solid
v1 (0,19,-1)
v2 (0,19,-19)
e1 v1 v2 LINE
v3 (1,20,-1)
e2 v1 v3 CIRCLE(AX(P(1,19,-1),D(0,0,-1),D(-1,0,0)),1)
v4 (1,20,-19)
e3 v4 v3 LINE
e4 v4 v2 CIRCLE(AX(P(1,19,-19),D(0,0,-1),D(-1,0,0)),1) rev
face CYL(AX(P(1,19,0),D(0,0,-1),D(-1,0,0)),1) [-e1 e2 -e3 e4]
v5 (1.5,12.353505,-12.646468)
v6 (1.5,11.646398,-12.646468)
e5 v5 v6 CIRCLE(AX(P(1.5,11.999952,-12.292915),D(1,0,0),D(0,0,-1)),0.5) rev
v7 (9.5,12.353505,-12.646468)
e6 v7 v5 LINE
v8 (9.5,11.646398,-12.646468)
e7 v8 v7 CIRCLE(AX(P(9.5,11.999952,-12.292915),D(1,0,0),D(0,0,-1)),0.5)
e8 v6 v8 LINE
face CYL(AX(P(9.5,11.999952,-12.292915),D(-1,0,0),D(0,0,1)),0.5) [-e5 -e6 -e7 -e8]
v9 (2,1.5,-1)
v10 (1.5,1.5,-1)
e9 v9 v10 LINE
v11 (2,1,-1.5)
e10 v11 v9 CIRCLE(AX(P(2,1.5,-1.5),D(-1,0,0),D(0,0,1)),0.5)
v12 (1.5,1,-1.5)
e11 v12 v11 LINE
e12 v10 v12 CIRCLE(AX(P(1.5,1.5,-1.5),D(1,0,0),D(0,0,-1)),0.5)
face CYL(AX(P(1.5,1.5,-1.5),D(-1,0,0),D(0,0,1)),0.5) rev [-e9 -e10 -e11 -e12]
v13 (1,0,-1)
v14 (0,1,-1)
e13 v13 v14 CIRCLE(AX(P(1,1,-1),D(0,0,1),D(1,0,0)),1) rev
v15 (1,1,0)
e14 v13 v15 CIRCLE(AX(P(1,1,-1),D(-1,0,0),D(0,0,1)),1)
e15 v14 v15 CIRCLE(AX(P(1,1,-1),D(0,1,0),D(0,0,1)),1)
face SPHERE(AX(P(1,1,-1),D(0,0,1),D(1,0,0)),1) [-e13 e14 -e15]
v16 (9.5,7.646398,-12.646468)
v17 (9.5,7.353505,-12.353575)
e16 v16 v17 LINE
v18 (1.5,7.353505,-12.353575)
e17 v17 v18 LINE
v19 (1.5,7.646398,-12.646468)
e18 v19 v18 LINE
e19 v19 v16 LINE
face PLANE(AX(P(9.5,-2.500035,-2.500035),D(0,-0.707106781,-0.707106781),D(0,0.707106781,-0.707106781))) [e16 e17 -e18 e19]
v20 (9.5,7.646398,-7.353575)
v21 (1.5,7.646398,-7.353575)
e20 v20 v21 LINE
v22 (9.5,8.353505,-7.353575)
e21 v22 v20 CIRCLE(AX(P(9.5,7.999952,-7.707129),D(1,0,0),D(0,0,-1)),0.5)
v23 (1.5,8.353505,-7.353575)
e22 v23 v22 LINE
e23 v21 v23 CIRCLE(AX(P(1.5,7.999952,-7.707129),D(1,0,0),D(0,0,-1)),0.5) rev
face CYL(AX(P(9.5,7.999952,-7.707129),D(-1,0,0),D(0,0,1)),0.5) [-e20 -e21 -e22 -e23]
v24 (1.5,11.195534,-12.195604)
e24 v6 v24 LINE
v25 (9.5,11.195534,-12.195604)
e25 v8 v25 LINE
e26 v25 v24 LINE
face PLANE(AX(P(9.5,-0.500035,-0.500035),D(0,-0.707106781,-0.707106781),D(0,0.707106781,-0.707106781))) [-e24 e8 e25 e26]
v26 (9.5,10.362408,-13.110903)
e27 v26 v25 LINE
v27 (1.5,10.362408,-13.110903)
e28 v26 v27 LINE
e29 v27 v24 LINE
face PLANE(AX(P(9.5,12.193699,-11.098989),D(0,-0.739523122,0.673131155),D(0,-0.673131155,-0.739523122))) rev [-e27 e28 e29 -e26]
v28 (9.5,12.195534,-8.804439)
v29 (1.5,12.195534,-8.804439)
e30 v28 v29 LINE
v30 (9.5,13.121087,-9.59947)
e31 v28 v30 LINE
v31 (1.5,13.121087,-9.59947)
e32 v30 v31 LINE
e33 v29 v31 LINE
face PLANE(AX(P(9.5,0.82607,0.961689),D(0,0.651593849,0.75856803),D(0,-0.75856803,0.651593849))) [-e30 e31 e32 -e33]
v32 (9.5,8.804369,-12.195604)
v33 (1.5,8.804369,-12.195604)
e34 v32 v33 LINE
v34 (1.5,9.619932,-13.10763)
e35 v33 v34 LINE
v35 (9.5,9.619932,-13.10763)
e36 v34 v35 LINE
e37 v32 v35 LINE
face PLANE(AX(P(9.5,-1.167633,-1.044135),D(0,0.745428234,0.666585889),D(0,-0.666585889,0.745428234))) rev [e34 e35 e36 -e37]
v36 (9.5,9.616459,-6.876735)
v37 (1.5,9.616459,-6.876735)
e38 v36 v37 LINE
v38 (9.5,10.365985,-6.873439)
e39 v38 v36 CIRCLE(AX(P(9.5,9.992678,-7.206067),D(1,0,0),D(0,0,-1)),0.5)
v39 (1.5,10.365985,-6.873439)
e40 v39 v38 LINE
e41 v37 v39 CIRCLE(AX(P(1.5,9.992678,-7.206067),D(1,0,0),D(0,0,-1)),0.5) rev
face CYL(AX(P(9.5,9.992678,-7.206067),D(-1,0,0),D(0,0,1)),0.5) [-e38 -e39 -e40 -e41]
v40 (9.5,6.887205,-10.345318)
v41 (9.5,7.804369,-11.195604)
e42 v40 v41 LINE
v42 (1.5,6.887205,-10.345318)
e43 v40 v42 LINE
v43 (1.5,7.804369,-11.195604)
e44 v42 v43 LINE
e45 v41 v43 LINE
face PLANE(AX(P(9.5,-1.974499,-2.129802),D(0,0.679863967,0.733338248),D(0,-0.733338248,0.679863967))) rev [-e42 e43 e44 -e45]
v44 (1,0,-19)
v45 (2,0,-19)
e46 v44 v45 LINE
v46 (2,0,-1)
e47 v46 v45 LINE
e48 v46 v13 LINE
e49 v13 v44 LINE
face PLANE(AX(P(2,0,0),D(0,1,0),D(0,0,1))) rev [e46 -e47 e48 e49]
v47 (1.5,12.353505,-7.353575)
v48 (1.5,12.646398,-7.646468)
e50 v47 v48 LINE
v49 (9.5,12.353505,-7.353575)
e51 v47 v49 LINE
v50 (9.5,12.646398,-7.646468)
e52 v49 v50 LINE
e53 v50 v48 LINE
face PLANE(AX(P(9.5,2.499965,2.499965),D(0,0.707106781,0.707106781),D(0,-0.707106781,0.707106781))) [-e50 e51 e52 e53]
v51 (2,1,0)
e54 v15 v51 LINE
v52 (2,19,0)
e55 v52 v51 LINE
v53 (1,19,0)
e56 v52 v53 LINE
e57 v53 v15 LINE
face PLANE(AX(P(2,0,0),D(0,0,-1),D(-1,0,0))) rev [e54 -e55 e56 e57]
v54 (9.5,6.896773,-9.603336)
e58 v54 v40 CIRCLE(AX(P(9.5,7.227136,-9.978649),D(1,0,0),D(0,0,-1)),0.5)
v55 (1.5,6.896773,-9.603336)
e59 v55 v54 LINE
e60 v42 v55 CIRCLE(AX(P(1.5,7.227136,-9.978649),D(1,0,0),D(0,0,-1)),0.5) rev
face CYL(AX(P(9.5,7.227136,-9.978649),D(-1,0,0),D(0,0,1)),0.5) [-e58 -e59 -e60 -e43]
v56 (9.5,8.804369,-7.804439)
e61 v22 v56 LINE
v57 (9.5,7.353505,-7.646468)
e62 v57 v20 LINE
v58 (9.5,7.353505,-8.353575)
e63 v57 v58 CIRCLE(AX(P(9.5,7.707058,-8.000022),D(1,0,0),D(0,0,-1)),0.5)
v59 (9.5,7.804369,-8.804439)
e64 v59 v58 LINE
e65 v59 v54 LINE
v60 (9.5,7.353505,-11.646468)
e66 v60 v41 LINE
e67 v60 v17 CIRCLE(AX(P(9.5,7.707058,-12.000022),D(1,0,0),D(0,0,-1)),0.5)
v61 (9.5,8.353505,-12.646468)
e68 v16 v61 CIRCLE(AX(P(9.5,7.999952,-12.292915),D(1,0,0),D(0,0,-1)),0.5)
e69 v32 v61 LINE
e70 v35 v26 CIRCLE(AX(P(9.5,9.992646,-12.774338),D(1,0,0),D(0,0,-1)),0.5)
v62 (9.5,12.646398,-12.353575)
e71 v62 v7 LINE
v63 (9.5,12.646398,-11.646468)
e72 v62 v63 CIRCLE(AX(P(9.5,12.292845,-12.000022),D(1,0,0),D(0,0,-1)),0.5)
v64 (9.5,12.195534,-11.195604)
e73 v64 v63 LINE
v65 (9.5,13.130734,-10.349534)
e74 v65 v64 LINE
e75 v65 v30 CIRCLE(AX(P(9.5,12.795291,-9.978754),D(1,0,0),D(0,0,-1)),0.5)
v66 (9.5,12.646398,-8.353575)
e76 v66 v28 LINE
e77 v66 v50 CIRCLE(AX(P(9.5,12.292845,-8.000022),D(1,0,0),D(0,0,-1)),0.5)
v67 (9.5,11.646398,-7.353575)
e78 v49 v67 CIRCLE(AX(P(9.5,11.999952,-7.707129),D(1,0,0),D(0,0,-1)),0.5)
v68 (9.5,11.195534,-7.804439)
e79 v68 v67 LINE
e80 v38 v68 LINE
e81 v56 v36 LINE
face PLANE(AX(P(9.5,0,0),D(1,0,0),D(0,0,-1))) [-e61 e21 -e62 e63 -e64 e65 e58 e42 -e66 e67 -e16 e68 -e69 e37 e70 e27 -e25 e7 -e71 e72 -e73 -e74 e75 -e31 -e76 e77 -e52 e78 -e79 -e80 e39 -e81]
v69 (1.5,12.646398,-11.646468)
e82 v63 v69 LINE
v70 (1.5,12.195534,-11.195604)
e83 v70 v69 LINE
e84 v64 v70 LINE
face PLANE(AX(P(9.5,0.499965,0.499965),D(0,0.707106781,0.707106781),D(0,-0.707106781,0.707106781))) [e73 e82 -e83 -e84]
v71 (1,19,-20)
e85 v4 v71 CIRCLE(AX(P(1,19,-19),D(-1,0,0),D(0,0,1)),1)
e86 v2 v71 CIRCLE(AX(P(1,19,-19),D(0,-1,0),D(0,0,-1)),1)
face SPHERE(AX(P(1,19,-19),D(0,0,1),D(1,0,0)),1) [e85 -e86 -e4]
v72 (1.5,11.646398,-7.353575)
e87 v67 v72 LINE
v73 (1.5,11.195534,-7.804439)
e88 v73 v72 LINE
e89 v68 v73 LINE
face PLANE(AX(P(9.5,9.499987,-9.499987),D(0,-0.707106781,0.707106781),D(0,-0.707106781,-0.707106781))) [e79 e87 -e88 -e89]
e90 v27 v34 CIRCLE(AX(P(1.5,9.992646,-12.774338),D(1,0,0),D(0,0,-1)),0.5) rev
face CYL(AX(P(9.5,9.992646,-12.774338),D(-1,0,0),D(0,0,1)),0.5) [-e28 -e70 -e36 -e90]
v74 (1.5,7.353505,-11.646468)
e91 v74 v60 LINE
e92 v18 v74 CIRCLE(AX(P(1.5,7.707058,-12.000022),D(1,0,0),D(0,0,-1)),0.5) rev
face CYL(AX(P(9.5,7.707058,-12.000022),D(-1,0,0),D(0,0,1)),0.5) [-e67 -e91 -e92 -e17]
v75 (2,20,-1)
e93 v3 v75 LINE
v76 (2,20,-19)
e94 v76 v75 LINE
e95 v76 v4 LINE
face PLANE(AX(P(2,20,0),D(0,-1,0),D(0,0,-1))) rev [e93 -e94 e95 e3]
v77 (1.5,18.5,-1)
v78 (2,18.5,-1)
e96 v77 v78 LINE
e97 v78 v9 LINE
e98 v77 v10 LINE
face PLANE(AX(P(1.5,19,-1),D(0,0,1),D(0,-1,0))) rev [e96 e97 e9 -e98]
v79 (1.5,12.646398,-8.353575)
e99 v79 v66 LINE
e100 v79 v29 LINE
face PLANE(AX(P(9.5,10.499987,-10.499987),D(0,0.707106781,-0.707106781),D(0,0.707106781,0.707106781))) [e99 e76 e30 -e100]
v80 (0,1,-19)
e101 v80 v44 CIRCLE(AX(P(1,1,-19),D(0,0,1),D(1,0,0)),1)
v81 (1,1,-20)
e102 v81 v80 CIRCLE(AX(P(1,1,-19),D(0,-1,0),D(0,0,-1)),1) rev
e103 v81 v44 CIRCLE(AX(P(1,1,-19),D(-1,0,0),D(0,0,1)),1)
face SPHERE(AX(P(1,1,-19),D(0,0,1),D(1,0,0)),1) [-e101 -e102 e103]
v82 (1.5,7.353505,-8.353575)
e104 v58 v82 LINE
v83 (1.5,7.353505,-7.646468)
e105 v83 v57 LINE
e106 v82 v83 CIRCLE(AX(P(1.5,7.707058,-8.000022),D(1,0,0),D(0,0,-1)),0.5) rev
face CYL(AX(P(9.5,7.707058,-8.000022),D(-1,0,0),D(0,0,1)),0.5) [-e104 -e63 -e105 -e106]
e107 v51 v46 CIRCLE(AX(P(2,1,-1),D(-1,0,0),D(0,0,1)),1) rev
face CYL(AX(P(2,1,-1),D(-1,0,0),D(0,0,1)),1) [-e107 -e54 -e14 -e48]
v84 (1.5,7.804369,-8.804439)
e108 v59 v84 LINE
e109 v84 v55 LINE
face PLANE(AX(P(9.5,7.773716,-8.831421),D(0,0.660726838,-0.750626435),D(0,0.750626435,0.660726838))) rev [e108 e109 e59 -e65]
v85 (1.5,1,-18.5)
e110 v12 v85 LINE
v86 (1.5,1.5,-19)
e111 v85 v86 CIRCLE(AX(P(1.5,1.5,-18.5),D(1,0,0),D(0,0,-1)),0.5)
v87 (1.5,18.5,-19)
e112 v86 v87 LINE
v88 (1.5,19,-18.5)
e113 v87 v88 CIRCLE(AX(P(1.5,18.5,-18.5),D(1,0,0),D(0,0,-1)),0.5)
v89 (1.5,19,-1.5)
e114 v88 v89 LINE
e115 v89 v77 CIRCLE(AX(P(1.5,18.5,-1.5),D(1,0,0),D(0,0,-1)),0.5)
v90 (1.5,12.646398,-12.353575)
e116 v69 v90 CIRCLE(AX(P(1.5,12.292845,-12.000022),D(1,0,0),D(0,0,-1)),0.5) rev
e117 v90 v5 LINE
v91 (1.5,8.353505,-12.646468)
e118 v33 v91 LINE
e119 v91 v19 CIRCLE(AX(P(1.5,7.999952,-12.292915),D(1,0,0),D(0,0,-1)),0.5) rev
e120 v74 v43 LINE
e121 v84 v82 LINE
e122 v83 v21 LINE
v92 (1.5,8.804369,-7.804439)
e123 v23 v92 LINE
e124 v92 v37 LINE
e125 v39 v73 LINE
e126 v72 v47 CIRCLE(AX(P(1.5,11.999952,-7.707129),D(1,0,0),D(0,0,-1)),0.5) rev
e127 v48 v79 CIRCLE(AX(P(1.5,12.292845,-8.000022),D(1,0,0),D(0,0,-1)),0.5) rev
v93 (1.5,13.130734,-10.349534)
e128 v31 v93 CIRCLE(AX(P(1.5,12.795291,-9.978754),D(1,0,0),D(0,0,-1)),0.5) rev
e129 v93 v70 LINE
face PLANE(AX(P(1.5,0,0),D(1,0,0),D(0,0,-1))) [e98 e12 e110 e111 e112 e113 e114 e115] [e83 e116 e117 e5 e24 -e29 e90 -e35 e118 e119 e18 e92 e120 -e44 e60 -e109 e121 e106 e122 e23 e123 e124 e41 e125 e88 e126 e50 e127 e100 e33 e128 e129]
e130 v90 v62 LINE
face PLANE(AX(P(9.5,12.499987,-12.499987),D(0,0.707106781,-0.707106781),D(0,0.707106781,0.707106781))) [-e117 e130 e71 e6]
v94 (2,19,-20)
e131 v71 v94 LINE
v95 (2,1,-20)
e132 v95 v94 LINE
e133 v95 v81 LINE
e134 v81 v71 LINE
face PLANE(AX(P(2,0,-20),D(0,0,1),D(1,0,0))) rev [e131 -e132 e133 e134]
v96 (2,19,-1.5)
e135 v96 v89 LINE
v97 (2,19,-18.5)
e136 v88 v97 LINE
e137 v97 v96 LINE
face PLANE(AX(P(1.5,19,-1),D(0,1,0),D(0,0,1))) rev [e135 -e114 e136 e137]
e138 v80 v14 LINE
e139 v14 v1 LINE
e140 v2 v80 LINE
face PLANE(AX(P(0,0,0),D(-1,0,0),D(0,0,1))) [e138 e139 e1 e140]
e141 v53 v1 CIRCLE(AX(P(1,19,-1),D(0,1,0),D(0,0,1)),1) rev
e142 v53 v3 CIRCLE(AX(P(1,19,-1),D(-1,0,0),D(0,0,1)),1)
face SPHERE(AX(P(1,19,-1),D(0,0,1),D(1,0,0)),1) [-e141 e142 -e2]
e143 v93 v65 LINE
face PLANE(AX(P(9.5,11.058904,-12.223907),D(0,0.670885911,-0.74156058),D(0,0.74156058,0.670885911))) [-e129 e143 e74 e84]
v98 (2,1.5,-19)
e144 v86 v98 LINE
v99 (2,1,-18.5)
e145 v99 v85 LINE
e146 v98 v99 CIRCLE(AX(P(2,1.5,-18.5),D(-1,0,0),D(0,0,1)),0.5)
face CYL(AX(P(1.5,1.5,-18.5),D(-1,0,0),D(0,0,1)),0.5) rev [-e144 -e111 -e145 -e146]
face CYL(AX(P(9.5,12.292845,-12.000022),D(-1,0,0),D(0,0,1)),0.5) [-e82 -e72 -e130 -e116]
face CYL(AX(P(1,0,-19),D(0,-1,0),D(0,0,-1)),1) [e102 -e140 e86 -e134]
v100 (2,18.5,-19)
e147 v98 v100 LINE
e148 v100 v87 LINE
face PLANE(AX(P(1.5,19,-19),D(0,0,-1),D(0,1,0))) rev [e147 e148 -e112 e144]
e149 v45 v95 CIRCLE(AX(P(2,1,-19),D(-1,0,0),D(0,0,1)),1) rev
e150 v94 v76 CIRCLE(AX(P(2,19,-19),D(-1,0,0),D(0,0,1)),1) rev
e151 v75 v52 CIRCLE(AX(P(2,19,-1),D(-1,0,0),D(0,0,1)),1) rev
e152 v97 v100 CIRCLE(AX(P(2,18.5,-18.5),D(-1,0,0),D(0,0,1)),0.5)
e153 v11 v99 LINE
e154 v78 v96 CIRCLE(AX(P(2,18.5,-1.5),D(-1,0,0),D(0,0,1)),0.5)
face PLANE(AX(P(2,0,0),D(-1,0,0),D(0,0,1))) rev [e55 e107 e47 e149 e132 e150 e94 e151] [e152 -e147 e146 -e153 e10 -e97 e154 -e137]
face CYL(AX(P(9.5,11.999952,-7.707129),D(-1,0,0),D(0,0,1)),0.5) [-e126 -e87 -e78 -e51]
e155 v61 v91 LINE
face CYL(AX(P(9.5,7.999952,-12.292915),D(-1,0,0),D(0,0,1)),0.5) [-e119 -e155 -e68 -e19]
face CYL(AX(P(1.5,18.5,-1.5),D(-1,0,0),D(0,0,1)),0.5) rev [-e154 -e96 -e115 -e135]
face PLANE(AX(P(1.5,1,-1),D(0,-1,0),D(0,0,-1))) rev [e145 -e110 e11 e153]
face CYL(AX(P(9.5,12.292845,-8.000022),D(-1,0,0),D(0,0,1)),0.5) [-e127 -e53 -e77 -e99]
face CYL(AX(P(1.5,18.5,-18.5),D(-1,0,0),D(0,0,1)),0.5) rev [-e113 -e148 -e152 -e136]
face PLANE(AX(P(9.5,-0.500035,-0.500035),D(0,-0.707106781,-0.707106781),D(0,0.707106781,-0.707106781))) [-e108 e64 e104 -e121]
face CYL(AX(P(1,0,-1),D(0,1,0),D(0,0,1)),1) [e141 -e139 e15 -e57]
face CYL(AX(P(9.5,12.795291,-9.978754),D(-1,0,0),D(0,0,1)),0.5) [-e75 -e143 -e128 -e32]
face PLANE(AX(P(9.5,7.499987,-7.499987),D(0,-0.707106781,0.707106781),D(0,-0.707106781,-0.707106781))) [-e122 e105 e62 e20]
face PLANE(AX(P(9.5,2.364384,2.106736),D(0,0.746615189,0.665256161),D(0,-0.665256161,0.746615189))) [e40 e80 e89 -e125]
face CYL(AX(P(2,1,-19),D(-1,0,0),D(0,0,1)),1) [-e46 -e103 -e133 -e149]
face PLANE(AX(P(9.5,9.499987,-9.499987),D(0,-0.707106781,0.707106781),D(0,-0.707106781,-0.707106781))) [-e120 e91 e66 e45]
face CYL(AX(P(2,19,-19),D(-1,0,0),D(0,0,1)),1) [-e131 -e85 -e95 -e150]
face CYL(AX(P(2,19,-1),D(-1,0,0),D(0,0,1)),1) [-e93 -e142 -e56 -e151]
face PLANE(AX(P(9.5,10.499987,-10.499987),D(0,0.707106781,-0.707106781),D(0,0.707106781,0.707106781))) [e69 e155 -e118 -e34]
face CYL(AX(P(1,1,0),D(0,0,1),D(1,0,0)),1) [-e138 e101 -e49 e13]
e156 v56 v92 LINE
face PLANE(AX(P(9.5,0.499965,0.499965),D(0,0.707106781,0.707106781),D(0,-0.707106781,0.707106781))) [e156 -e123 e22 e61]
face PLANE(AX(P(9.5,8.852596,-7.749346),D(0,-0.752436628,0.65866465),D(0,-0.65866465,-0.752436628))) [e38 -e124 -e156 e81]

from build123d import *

# Parameters (mm, degrees)
SKETCH2_W           = 20
SKETCH2_H           = 20
BOSS_EXTRUDE1_DEPTH = 2
SKETCH3_W           = 18
SKETCH3_H           = 18
CUT_EXTRUDE1_DEPTH  = 0.5
FILLET1_R           = 1
FILLET2_R           = 1
FILLET3_R           = 0.5
BOSS_EXTRUDE3_DEPTH = 8
FILLET4_R           = 0.5


with BuildPart() as part:
    # Sketch2 → Boss-Extrude1 (new body)
    with BuildSketch(Plane(origin=(0, 0, 0), x_dir=(0, 0, -1), z_dir=(1, 0, 0))):
        with Locations((10, 10)):
            Rectangle(SKETCH2_W, SKETCH2_H)
    extrude(amount=BOSS_EXTRUDE1_DEPTH)

    # Sketch3 → Cut-Extrude1 (cut)
    with BuildSketch(Plane(origin=(2, 0, 0), x_dir=(0, 0, -1), z_dir=(1, 0, 0))):
        with Locations((10, 10)):
            Rectangle(SKETCH3_W, SKETCH3_H)
    extrude(amount=-CUT_EXTRUDE1_DEPTH, mode=Mode.SUBTRACT)

    # Fillet1
    fillet1_edges = [part.edges().sort_by_distance(p)[0] for p in [
        (0, 20, -10),
        (0, 10, -20),
        (0, 0, -10),
        (0, 10, 0),
    ]]
    fillet(fillet1_edges, radius=FILLET1_R)

    # Fillet2
    # the kernel refuses this fillet: 1 mm, written as the material it takes off along each edge
    with BuildSketch(Plane(origin=(1, 19, -1), x_dir=(0, 1, 0), z_dir=(0, 0, 1))) as fillet2_piece_1_section:
        Polygon((0, 0), (FILLET2_R, 0), (FILLET2_R, FILLET2_R), (0, FILLET2_R), align=None)
    fillet2_piece_1 = extrude(amount=FILLET2_R, mode=Mode.PRIVATE)
    fillet2_piece_1 = fillet2_piece_1 - Plane(origin=(1, 19, -1), x_dir=(0.7071067811865475, -0.7071067811865475, 0), z_dir=(0, 0, 1)) * Sphere(FILLET2_R, mode=Mode.PRIVATE)
    add(fillet2_piece_1, mode=Mode.SUBTRACT)
    with BuildSketch(Plane(origin=(1, 19, -19), x_dir=(0, 1, 0), z_dir=(0, 0, -1))) as fillet2_piece_2_section:
        Polygon((0, 0), (FILLET2_R, 0), (FILLET2_R, -FILLET2_R), (0, -FILLET2_R), align=None)
    fillet2_piece_2 = extrude(amount=FILLET2_R, mode=Mode.PRIVATE)
    fillet2_piece_2 = fillet2_piece_2 - Plane(origin=(1, 19, -19), x_dir=(0.7071067811865475, -0.7071067811865475, 0), z_dir=(0, 0, -1)) * Sphere(FILLET2_R, mode=Mode.PRIVATE)
    add(fillet2_piece_2, mode=Mode.SUBTRACT)
    with BuildSketch(Plane(origin=(1, 1, -1), x_dir=(0, 0, 1), z_dir=(0, -1, 0))) as fillet2_piece_3_section:
        Polygon((0, 0), (FILLET2_R, 0), (FILLET2_R, FILLET2_R), (0, FILLET2_R), align=None)
    fillet2_piece_3 = extrude(amount=FILLET2_R, mode=Mode.PRIVATE)
    fillet2_piece_3 = fillet2_piece_3 - Plane(origin=(1, 1, -1), x_dir=(0.7071067811865475, 0, -0.7071067811865475), z_dir=(0, -1, 0)) * Sphere(FILLET2_R, mode=Mode.PRIVATE)
    add(fillet2_piece_3, mode=Mode.SUBTRACT)
    with BuildSketch(Plane(origin=(1, 1, -19), x_dir=(0, 0, -1), z_dir=(0, -1, 0))) as fillet2_piece_4_section:
        Polygon((0, 0), (FILLET2_R, 0), (FILLET2_R, -FILLET2_R), (0, -FILLET2_R), align=None)
    fillet2_piece_4 = extrude(amount=FILLET2_R, mode=Mode.PRIVATE)
    fillet2_piece_4 = fillet2_piece_4 - Plane(origin=(1, 1, -19), x_dir=(0.7071067811865475, 0, 0.7071067811865475), z_dir=(0, -1, 0)) * Sphere(FILLET2_R, mode=Mode.PRIVATE)
    add(fillet2_piece_4, mode=Mode.SUBTRACT)
    with BuildSketch(Plane(origin=(1, 20, 0), x_dir=(0, -1, 0), z_dir=(1, 0, 0)), Plane(origin=(1, 0, 0), x_dir=(0, 0, -1), z_dir=(1, 0, 0))) as fillet2_piece_5:
        with BuildLine():
            CenterArc((FILLET2_R, FILLET2_R), FILLET2_R, 180, 90)
            Line((0, FILLET2_R), (0, 0))
            Line((0, 0), (FILLET2_R, 0))
        make_face()
    extrude(amount=3.5, mode=Mode.SUBTRACT)
    with BuildSketch(Plane(origin=(1, 20, -20), x_dir=(0, -1, 0), z_dir=(1, 0, 0)), Plane(origin=(1, 0, -20), x_dir=(0, 0, 1), z_dir=(1, 0, 0))) as fillet2_piece_6:
        with BuildLine():
            CenterArc((FILLET2_R, -FILLET2_R), FILLET2_R, 90, 90)
            Line((0, -FILLET2_R), (0, 0))
            Line((0, 0), (FILLET2_R, 0))
        make_face()
    extrude(amount=3.5, mode=Mode.SUBTRACT)

    # Fillet3
    fillet3_edges = [part.edges().sort_by_distance(p)[0] for p in [
        (1.75, 1, -1),
        (1.75, 19, -1),
        (1.75, 19, -19),
        (1.75, 1, -19),
    ]]
    fillet(fillet3_edges, radius=FILLET3_R)

    # Sketch5 → Boss-Extrude3 (add)
    with BuildSketch(Plane(origin=(1.5, 0, 0), x_dir=(0, 0, -1), z_dir=(1, 0, 0))):
        with BuildLine():
            Line((10.674031368, 12.407379911), (10.674031368, 12.772052319))
            Line((10.674031368, 12.772052319), (9.969031368, 13.551320747))
            Line((9.969031368, 13.551320747), (9.264031368, 12.730578714))
            Line((9.264031368, 12.730578714), (9.264031368, 12.389160229))
            ThreePointArc((9.264031368, 12.389160229), (9.967720161, 12.499742887), (10.674031368, 12.407379911))
        make_face()
        with BuildLine():
            ThreePointArc((8.804439368, 12.195534071), (9.029395093, 12.30383605), (9.264031368, 12.389160229))
            Line((9.264031368, 12.389160229), (9.264031368, 12.730578714))
            Line((9.264031368, 12.730578714), (8.804439368, 12.195534071))
        make_face()
        with BuildLine():
            ThreePointArc((10.674031368, 12.407379911), (10.940799854, 12.316184891), (11.19560436, 12.195534071))
            Line((11.19560436, 12.195534071), (10.674031368, 12.772052319))
            Line((10.674031368, 12.772052319), (10.674031368, 12.407379911))
        make_face()
        with BuildLine():
            Line((9.264031368, 12.195534071), (10.674031368, 12.195534071))
            Line((10.674031368, 12.195534071), (10.674031368, 12.407379911))
            ThreePointArc((10.674031368, 12.407379911), (9.967720161, 12.499742887), (9.264031368, 12.389160229))
            Line((9.264031368, 12.389160229), (9.264031368, 12.195534071))
        make_face()
        with BuildLine():
            Line((8.804439368, 12.195534071), (9.264031368, 12.195534071))
            Line((9.264031368, 12.195534071), (9.264031368, 12.389160229))
            ThreePointArc((9.264031368, 12.389160229), (9.029395093, 12.30383605), (8.804439368, 12.195534071))
        make_face()
        with BuildLine():
            Line((10.674031368, 12.195534071), (11.19560436, 12.195534071))
            ThreePointArc((11.19560436, 12.195534071), (10.940799854, 12.316184891), (10.674031368, 12.407379911))
            Line((10.674031368, 12.407379911), (10.674031368, 12.195534071))
        make_face()
        Polygon((10.000021864, 10.999951576), (10.674031368, 11.67396108), (10.674031368, 12.195534071), (9.264031368, 12.195534071), (9.264031368, 11.735942071), align=None)
        Polygon((9.264031368, 11.735942071), (9.264031368, 12.195534071), (8.804439368, 12.195534071), align=None)
        Polygon((10.674031368, 11.67396108), (11.19560436, 12.195534071), (10.674031368, 12.195534071), align=None)
        with BuildLine():
            ThreePointArc((12.19560436, 11.195534071), (11.767788817, 11.767718529), (11.19560436, 12.195534071))
            Line((11.19560436, 12.195534071), (10.674031368, 11.67396108))
            Line((10.674031368, 11.67396108), (10.674031368, 10.694356296))
            Line((10.674031368, 10.694356296), (11.694426585, 10.694356296))
            Line((11.694426585, 10.694356296), (12.19560436, 11.195534071))
        make_face()
        with BuildLine():
            Line((13.000021864, 11.999951576), (12.000021864, 12.999951576))
            Line((12.000021864, 12.999951576), (11.19560436, 12.195534071))
            ThreePointArc((11.19560436, 12.195534071), (11.767788817, 11.767718529), (12.19560436, 11.195534071))
            Line((12.19560436, 11.195534071), (13.000021864, 11.999951576))
        make_face()
        with BuildLine():
            Line((9.264031368, 10.694356296), (9.264031368, 11.735942071))
            Line((9.264031368, 11.735942071), (8.804439368, 12.195534071))
            ThreePointArc((8.804439368, 12.195534071), (8.232254911, 11.767718529), (7.804439368, 11.195534071))
            Line((7.804439368, 11.195534071), (8.305617143, 10.694356296))
            Line((8.305617143, 10.694356296), (9.264031368, 10.694356296))
        make_face()
        with BuildLine():
            ThreePointArc((7.804439368, 11.195534071), (8.232254911, 11.767718529), (8.804439368, 12.195534071))
            Line((8.804439368, 12.195534071), (8.000021864, 12.999951576))
            Line((8.000021864, 12.999951576), (7.000021864, 11.999951576))
            Line((7.000021864, 11.999951576), (7.804439368, 11.195534071))
        make_face()
        Polygon((9.694426585, 10.694356296), (10.000021864, 10.999951576), (9.264031368, 11.735942071), (9.264031368, 10.694356296), align=None)
        Polygon((10.674031368, 10.694356296), (10.674031368, 11.67396108), (10.000021864, 10.999951576), (10.305617143, 10.694356296), align=None)
        Polygon((10.305617143, 10.694356296), (10.000021864, 10.999951576), (9.694426585, 10.694356296), align=None)
        Polygon((9.264031368, 10.26396108), (9.694426585, 10.694356296), (9.264031368, 10.694356296), align=None)
        Polygon((9.000021864, 9.999951576), (9.264031368, 10.26396108), (9.264031368, 10.694356296), (8.305617143, 10.694356296), align=None)
        Polygon((10.305617143, 10.694356296), (9.694426585, 10.694356296), (9.264031368, 10.26396108), (9.264031368, 9.735942071), (9.715617143, 9.284356296), (10.284426585, 9.284356296), (10.674031368, 9.67396108), (10.674031368, 10.325942071), align=None)
        Polygon((11.000021864, 9.999951576), (11.694426585, 10.694356296), (10.674031368, 10.694356296), (10.674031368, 10.325942071), align=None)
        Polygon((9.264031368, 9.735942071), (9.264031368, 10.26396108), (9.000021864, 9.999951576), align=None)
        Polygon((10.674031368, 9.67396108), (11.000021864, 9.999951576), (10.674031368, 10.325942071), align=None)
        Polygon((10.674031368, 10.325942071), (10.674031368, 10.694356296), (10.305617143, 10.694356296), align=None)
        with BuildLine():
            Line((7.804439368, 10.694356296), (7.804439368, 11.195534071))
            ThreePointArc((7.804439368, 11.195534071), (7.687799186, 10.950544173), (7.59839698, 10.694356296))
            Line((7.59839698, 10.694356296), (7.804439368, 10.694356296))
        make_face()
        with BuildLine():
            Line((7.804439368, 9.284356296), (7.804439368, 10.694356296))
            Line((7.804439368, 10.694356296), (7.59839698, 10.694356296))
            ThreePointArc((7.59839698, 10.694356296), (7.500046256, 9.988908081), (7.604625572, 9.284356296))
            Line((7.604625572, 9.284356296), (7.804439368, 9.284356296))
        make_face()
        with BuildLine():
            ThreePointArc((7.59839698, 10.694356296), (7.687799186, 10.950544173), (7.804439368, 11.195534071))
            Line((7.804439368, 11.195534071), (7.241968907, 10.694356296))
            Line((7.241968907, 10.694356296), (7.59839698, 10.694356296))
        make_face()
        with BuildLine():
            Line((7.59839698, 10.694356296), (7.241968907, 10.694356296))
            Line((7.241968907, 10.694356296), (6.450749314, 9.989356296))
            Line((6.450749314, 9.989356296), (7.256117908, 9.284356296))
            Line((7.256117908, 9.284356296), (7.604625572, 9.284356296))
            ThreePointArc((7.604625572, 9.284356296), (7.500046256, 9.988908081), (7.59839698, 10.694356296))
        make_face()
        Polygon((8.284426585, 9.284356296), (9.000021864, 9.999951576), (8.305617143, 10.694356296), (7.804439368, 10.694356296), (7.804439368, 9.284356296), align=None)
        Polygon((8.305617143, 10.694356296), (7.804439368, 11.195534071), (7.804439368, 10.694356296), align=None)
        with BuildLine():
            Line((7.804439368, 8.80436908), (7.804439368, 9.284356296))
            Line((7.804439368, 9.284356296), (7.604625572, 9.284356296))
            ThreePointArc((7.604625572, 9.284356296), (7.692020891, 9.039154245), (7.804439368, 8.80436908))
        make_face()
        Polygon((7.804439368, 8.80436908), (8.284426585, 9.284356296), (7.804439368, 9.284356296), align=None)
        with BuildLine():
            Line((9.264031368, 9.284356296), (8.284426585, 9.284356296))
            Line((8.284426585, 9.284356296), (7.804439368, 8.80436908))
            ThreePointArc((7.804439368, 8.80436908), (8.232254911, 8.232184623), (8.804439368, 7.80436908))
            Line((8.804439368, 7.80436908), (9.264031368, 8.26396108))
            Line((9.264031368, 8.26396108), (9.264031368, 9.284356296))
        make_face()
        Polygon((9.264031368, 9.735942071), (9.000021864, 9.999951576), (8.284426585, 9.284356296), (9.264031368, 9.284356296), align=None)
        Polygon((9.715617143, 9.284356296), (9.264031368, 9.735942071), (9.264031368, 9.284356296), align=None)
        Polygon((9.264031368, 8.26396108), (10.000021864, 8.999951576), (9.715617143, 9.284356296), (9.264031368, 9.284356296), align=None)
        Polygon((9.264031368, 7.80436908), (9.264031368, 8.26396108), (8.804439368, 7.80436908), align=None)
        Polygon((10.674031368, 8.325942071), (10.000021864, 8.999951576), (9.264031368, 8.26396108), (9.264031368, 7.80436908), (10.674031368, 7.80436908), align=None)
        with BuildLine():
            Line((10.674031368, 7.592523241), (10.674031368, 7.80436908))
            Line((10.674031368, 7.80436908), (9.264031368, 7.80436908))
            Line((9.264031368, 7.80436908), (9.264031368, 7.610742922))
            ThreePointArc((9.264031368, 7.610742922), (9.967720161, 7.500160264), (10.674031368, 7.592523241))
        make_face()
        with BuildLine():
            Line((12.19560436, 8.80436908), (11.715617143, 9.284356296))
            Line((11.715617143, 9.284356296), (10.674031368, 9.284356296))
            Line((10.674031368, 9.284356296), (10.674031368, 8.325942071))
            Line((10.674031368, 8.325942071), (11.19560436, 7.80436908))
            ThreePointArc((11.19560436, 7.80436908), (11.767788817, 8.232184623), (12.19560436, 8.80436908))
        make_face()
        Polygon((10.674031368, 9.284356296), (10.284426585, 9.284356296), (10.000021864, 8.999951576), (10.674031368, 8.325942071), align=None)
        Polygon((10.000021864, 8.999951576), (10.284426585, 9.284356296), (9.715617143, 9.284356296), align=None)
        Polygon((10.674031368, 9.284356296), (10.674031368, 9.67396108), (10.284426585, 9.284356296), align=None)
        Polygon((11.715617143, 9.284356296), (11.000021864, 9.999951576), (10.674031368, 9.67396108), (10.674031368, 9.284356296), align=None)
        Polygon((12.19560436, 10.694356296), (11.694426585, 10.694356296), (11.000021864, 9.999951576), (11.715617143, 9.284356296), (12.19560436, 9.284356296), align=None)
        Polygon((12.19560436, 10.694356296), (12.19560436, 11.195534071), (11.694426585, 10.694356296), align=None)
        with BuildLine():
            ThreePointArc((12.401646748, 10.694356296), (12.312244542, 10.950544173), (12.19560436, 11.195534071))
            Line((12.19560436, 11.195534071), (12.19560436, 10.694356296))
            Line((12.19560436, 10.694356296), (12.401646748, 10.694356296))
        make_face()
        with BuildLine():
            Line((12.401646748, 10.694356296), (12.19560436, 10.694356296))
            Line((12.19560436, 10.694356296), (12.19560436, 9.284356296))
            Line((12.19560436, 9.284356296), (12.395418156, 9.284356296))
            ThreePointArc((12.395418156, 9.284356296), (12.473732713, 9.638351472), (12.500021864, 9.999951576))
            ThreePointArc((12.500021864, 9.999951576), (12.475305909, 10.350620786), (12.401646748, 10.694356296))
        make_face()
        Polygon((12.19560436, 8.80436908), (12.19560436, 9.284356296), (11.715617143, 9.284356296), align=None)
        with BuildLine():
            Line((12.395418156, 9.284356296), (12.19560436, 9.284356296))
            Line((12.19560436, 9.284356296), (12.19560436, 8.80436908))
            ThreePointArc((12.19560436, 8.80436908), (12.308022836, 9.039154245), (12.395418156, 9.284356296))
        make_face()
        with BuildLine():
            Line((13.520749314, 9.989356296), (12.746214074, 10.694356296))
            Line((12.746214074, 10.694356296), (12.401646748, 10.694356296))
            ThreePointArc((12.401646748, 10.694356296), (12.475305909, 10.350620786), (12.500021864, 9.999951576))
            ThreePointArc((12.500021864, 9.999951576), (12.473732713, 9.638351472), (12.395418156, 9.284356296))
            Line((12.395418156, 9.284356296), (12.732363431, 9.284356296))
            Line((12.732363431, 9.284356296), (13.520749314, 9.989356296))
        make_face()
        with BuildLine():
            Line((12.19560436, 8.80436908), (12.732363431, 9.284356296))
            Line((12.732363431, 9.284356296), (12.395418156, 9.284356296))
            ThreePointArc((12.395418156, 9.284356296), (12.308022836, 9.039154245), (12.19560436, 8.80436908))
        make_face()
        with BuildLine():
            Line((12.746214074, 10.694356296), (12.19560436, 11.195534071))
            ThreePointArc((12.19560436, 11.195534071), (12.312244542, 10.950544173), (12.401646748, 10.694356296))
            Line((12.401646748, 10.694356296), (12.746214074, 10.694356296))
        make_face()
        Polygon((10.674031368, 7.80436908), (11.19560436, 7.80436908), (10.674031368, 8.325942071), align=None)
        with BuildLine():
            ThreePointArc((10.674031368, 7.592523241), (10.940799854, 7.68371826), (11.19560436, 7.80436908))
            Line((11.19560436, 7.80436908), (10.674031368, 7.80436908))
            Line((10.674031368, 7.80436908), (10.674031368, 7.592523241))
        make_face()
        with BuildLine():
            Line((9.264031368, 7.610742922), (9.264031368, 7.80436908))
            Line((9.264031368, 7.80436908), (8.804439368, 7.80436908))
            ThreePointArc((8.804439368, 7.80436908), (9.029395093, 7.696067101), (9.264031368, 7.610742922))
        make_face()
        with BuildLine():
            Line((9.264031368, 7.282244225), (9.264031368, 7.610742922))
            ThreePointArc((9.264031368, 7.610742922), (9.029395093, 7.696067101), (8.804439368, 7.80436908))
            Line((8.804439368, 7.80436908), (9.264031368, 7.282244225))
        make_face()
        with BuildLine():
            Line((9.969031368, 6.481320747), (10.674031368, 7.241772087))
            Line((10.674031368, 7.241772087), (10.674031368, 7.592523241))
            ThreePointArc((10.674031368, 7.592523241), (9.967720161, 7.500160264), (9.264031368, 7.610742922))
            Line((9.264031368, 7.610742922), (9.264031368, 7.282244225))
            Line((9.264031368, 7.282244225), (9.969031368, 6.481320747))
        make_face()
        with BuildLine():
            Line((10.674031368, 7.241772087), (11.19560436, 7.80436908))
            ThreePointArc((11.19560436, 7.80436908), (10.940799854, 7.68371826), (10.674031368, 7.592523241))
            Line((10.674031368, 7.592523241), (10.674031368, 7.241772087))
        make_face()
        with BuildLine():
            ThreePointArc((8.804439368, 7.80436908), (8.232254911, 8.232184623), (7.804439368, 8.80436908))
            Line((7.804439368, 8.80436908), (7.000021864, 7.999951576))
            Line((7.000021864, 7.999951576), (8.000021864, 6.999951576))
            Line((8.000021864, 6.999951576), (8.804439368, 7.80436908))
        make_face()
        with BuildLine():
            Line((13.000021864, 7.999951576), (12.19560436, 8.80436908))
            ThreePointArc((12.19560436, 8.80436908), (11.767788817, 8.232184623), (11.19560436, 7.80436908))
            Line((11.19560436, 7.80436908), (12.000021864, 6.999951576))
            Line((12.000021864, 6.999951576), (13.000021864, 7.999951576))
        make_face()
        with BuildLine():
            ThreePointArc((7.804439368, 8.80436908), (7.692020891, 9.039154245), (7.604625572, 9.284356296))
            Line((7.604625572, 9.284356296), (7.256117908, 9.284356296))
            Line((7.256117908, 9.284356296), (7.804439368, 8.80436908))
        make_face()
    extrude(amount=BOSS_EXTRUDE3_DEPTH)

    # Fillet4
    fillet4_edges = [part.edges().sort_by_distance(p)[0] for p in [
        (5.5, 6.999951576, -8.000021864),
        (5.5, 6.481320747, -9.969031368),
        (5.5, 6.999951576, -12.000021864),
        (5.5, 7.999951576, -13.000021864),
        (5.5, 9.989356296, -13.520749314),
        (5.5, 11.999951576, -13.000021864),
        (5.5, 12.999951576, -12.000021864),
        (5.5, 13.551320747, -9.969031368),
        (5.5, 12.999951576, -8.000021864),
        (5.5, 11.999951576, -7.000021864),
        (5.5, 9.989356296, -6.450749314),
        (5.5, 7.999951576, -7.000021864),
    ]]
    fillet(fillet4_edges, radius=FILLET4_R)


solid = part.part
